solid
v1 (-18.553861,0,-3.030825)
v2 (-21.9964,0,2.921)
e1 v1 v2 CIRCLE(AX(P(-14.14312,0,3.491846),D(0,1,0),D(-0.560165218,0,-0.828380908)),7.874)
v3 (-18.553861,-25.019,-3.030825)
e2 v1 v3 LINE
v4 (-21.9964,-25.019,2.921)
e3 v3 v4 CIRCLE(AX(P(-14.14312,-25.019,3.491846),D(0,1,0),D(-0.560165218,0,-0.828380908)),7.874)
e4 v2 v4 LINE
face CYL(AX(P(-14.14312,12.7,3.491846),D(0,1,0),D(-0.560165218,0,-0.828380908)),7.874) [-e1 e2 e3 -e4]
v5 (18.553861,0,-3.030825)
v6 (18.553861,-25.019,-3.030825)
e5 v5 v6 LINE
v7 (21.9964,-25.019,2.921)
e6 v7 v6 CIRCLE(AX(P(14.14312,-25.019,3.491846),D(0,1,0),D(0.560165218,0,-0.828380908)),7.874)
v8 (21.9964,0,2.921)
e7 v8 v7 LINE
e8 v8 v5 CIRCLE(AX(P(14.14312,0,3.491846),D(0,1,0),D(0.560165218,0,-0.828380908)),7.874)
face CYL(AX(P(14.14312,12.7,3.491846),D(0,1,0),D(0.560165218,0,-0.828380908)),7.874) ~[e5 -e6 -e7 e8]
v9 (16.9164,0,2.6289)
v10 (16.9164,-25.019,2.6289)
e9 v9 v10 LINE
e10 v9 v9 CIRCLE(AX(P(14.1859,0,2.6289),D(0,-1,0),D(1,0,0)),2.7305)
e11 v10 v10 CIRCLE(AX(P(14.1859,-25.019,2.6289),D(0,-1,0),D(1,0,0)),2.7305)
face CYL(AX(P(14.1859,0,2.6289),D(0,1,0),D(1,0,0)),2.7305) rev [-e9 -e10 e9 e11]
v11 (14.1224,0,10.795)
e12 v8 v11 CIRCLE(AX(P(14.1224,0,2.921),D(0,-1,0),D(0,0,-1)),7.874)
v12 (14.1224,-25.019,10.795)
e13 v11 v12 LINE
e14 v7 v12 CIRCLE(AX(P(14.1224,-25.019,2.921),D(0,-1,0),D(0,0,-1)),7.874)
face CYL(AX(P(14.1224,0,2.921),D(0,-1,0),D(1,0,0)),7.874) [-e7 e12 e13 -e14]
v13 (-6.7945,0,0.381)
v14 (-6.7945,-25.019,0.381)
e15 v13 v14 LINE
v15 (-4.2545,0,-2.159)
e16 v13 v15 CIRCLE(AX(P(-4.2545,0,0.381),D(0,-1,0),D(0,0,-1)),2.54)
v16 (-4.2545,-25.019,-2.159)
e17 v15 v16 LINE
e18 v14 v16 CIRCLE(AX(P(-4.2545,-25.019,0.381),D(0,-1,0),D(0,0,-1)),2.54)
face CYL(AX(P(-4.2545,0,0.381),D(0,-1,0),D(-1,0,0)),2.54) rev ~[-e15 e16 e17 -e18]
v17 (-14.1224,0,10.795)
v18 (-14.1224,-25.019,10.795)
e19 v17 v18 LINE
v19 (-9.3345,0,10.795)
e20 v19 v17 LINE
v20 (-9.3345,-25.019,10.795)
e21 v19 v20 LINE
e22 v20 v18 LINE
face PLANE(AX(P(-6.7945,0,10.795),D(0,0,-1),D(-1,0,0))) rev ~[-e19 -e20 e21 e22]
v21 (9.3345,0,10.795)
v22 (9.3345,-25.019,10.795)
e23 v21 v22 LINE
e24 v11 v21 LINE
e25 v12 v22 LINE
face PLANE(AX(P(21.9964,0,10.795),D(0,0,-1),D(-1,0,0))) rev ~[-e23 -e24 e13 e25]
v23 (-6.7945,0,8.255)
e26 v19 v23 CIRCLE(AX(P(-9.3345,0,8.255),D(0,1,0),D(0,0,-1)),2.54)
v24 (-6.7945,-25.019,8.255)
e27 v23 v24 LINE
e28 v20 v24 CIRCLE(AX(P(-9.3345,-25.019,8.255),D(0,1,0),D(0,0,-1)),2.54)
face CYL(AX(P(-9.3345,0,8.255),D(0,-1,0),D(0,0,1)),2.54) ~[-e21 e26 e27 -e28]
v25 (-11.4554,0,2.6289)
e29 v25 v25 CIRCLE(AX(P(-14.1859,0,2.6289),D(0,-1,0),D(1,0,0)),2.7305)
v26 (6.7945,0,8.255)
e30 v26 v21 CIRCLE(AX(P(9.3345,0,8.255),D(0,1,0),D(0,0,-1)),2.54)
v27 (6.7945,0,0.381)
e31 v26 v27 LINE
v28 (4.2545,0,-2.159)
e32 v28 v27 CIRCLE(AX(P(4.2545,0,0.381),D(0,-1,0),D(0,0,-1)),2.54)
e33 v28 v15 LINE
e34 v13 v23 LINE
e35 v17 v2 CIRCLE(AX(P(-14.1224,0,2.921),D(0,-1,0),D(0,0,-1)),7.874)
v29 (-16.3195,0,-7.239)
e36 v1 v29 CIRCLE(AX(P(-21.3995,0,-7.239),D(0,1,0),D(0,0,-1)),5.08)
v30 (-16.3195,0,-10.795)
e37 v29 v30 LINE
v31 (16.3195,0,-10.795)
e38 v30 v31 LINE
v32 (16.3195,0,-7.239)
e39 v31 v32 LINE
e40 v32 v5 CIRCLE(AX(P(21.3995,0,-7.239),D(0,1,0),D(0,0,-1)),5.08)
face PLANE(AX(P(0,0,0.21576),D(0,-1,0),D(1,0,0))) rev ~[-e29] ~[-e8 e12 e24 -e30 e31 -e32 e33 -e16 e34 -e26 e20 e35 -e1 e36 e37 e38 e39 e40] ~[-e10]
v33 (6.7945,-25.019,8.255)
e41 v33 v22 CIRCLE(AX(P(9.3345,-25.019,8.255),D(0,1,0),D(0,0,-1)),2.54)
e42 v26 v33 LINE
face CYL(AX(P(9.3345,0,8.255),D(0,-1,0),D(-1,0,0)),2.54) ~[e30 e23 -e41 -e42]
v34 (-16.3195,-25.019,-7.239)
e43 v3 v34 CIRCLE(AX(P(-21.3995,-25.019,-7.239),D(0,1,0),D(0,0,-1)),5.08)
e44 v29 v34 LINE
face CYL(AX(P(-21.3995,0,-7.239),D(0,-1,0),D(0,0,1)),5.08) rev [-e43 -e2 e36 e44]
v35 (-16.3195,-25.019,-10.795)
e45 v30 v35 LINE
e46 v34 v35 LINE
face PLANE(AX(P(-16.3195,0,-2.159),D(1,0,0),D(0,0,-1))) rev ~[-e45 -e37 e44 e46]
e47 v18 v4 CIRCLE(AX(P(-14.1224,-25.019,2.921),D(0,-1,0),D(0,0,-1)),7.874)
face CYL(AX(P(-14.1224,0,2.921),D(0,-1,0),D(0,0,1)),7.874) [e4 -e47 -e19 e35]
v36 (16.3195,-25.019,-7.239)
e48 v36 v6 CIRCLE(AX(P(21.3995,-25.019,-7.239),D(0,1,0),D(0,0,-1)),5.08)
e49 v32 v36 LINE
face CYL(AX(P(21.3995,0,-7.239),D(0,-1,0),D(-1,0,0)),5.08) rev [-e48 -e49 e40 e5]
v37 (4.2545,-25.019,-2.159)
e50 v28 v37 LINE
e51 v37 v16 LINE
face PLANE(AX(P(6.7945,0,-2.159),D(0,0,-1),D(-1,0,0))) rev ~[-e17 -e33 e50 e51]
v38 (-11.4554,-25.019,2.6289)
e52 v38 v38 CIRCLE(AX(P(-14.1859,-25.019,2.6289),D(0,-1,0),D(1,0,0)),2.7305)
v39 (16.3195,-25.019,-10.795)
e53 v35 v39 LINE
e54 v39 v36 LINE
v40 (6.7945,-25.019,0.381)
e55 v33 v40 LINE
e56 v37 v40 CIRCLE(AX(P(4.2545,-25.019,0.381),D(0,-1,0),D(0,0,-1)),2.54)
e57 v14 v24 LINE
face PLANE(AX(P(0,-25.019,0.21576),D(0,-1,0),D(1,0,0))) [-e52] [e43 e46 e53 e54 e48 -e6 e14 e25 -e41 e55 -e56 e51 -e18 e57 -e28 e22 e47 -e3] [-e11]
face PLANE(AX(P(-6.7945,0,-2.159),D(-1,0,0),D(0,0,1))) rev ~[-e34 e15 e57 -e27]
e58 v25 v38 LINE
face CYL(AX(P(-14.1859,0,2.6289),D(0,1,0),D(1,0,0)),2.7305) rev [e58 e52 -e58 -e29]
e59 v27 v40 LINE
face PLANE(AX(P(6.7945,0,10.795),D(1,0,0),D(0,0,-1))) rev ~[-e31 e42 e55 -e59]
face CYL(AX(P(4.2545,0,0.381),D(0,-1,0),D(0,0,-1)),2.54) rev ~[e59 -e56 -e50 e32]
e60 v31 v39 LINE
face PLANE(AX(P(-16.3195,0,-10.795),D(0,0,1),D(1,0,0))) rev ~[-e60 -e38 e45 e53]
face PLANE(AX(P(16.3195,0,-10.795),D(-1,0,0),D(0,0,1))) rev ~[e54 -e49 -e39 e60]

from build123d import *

# Parameters (mm, degrees)
F0_R        = 2.7305
F1_DEPTH    = 25.019
F2_R        = 2.54
F3_R        = 7.874
F4_R        = 5.08
F5_T1_DEPTH = 50.419


# Not quite as in the source:
# - a fillet or chamfer that OpenCascade refuses, or shapes differently, is made with other operations: its cross-section is extruded or revolved along the edge and cut away or added


with BuildPart() as f1:
    # F0 (on Front) → F1 (new body)
    with BuildSketch(Plane.XZ):
        Polygon((-6.7945, 10.795), (-21.9964, 10.795), (-21.9964, -2.159), (-16.3195, -2.159), (-16.3195, -10.795), (0, -10.795), (16.3195, -10.795), (16.3195, -2.159), (21.9964, -2.159), (21.9964, 10.795), (6.7945, 10.795), (6.7945, -2.159), (0, -2.159), (-6.7945, -2.159), align=None)
        with Locations((-14.1859, 2.6289)):
            Circle(F0_R, mode=Mode.SUBTRACT)
        with Locations((14.1859, 2.6289)):
            Circle(F0_R, mode=Mode.SUBTRACT)
    extrude(amount=F1_DEPTH)

    # F2
    f2_edges = [f1.edges().sort_by_distance(p)[0] for p in [
        (-6.7945, -12.5095, 10.795),
        (-6.7945, -12.5095, -2.159),
        (6.7945, -12.5095, -2.159),
        (6.7945, -12.5095, 10.795),
    ]]
    fillet(f2_edges, radius=F2_R)

    # F3
    f3_edges = [f1.edges().sort_by_distance(p)[0] for p in [
        (-21.9964, -12.5095, 10.795),
        (21.9964, -12.5095, 10.795),
    ]]
    fillet(f3_edges, radius=F3_R)

    # F4
    f4_edges = [f1.edges().sort_by_distance(p)[0] for p in [
        (-16.3195, -12.5095, -2.159),
        (16.3195, -12.5095, -2.159),
    ]]
    fillet(f4_edges, radius=F4_R)

    # F5: fillet of radius 7.874 on 2 edges, made by hand

    # F5_s2 → F5_t1 (cut)
    with BuildSketch(Plane.XZ.offset(-12.7)):
        with BuildLine():
            ThreePointArc((-18.5538606902, -3.0308249896), (-20.9591016403, -0.4505219212), (-21.9964, 2.921))
            Line((-21.9964, 2.921), (-22.781728024, 2.8639153723))
            ThreePointArc((-22.781728024, 2.8639153723), (-22.7838, 0.381), (-22.7838, -2.159))
            Line((-22.7838, -2.159), (-21.9964, -2.9464))
            ThreePointArc((-21.9964, -2.9464), (-21.3995, -2.9464), (-18.9949347832, -3.6830921162))
            Line((-18.9949347832, -3.6830921162), (-18.5538606902, -3.0308249896))
        make_face()
        with BuildLine():
            ThreePointArc((18.5538606902, -3.0308249896), (20.9591016403, -0.4505219212), (21.9964, 2.921))
            Line((21.9964, 2.921), (22.781728024, 2.8639153723))
            ThreePointArc((22.781728024, 2.8639153723), (22.7838, 0.381), (22.7838, -2.159))
            Line((22.7838, -2.159), (21.9964, -2.9464))
            ThreePointArc((21.9964, -2.9464), (21.3995, -2.9464), (18.9949347832, -3.6830921162))
            Line((18.9949347832, -3.6830921162), (18.5538606902, -3.0308249896))
        make_face()
    extrude(amount=F5_T1_DEPTH, mode=Mode.SUBTRACT)


solid = f1.part
